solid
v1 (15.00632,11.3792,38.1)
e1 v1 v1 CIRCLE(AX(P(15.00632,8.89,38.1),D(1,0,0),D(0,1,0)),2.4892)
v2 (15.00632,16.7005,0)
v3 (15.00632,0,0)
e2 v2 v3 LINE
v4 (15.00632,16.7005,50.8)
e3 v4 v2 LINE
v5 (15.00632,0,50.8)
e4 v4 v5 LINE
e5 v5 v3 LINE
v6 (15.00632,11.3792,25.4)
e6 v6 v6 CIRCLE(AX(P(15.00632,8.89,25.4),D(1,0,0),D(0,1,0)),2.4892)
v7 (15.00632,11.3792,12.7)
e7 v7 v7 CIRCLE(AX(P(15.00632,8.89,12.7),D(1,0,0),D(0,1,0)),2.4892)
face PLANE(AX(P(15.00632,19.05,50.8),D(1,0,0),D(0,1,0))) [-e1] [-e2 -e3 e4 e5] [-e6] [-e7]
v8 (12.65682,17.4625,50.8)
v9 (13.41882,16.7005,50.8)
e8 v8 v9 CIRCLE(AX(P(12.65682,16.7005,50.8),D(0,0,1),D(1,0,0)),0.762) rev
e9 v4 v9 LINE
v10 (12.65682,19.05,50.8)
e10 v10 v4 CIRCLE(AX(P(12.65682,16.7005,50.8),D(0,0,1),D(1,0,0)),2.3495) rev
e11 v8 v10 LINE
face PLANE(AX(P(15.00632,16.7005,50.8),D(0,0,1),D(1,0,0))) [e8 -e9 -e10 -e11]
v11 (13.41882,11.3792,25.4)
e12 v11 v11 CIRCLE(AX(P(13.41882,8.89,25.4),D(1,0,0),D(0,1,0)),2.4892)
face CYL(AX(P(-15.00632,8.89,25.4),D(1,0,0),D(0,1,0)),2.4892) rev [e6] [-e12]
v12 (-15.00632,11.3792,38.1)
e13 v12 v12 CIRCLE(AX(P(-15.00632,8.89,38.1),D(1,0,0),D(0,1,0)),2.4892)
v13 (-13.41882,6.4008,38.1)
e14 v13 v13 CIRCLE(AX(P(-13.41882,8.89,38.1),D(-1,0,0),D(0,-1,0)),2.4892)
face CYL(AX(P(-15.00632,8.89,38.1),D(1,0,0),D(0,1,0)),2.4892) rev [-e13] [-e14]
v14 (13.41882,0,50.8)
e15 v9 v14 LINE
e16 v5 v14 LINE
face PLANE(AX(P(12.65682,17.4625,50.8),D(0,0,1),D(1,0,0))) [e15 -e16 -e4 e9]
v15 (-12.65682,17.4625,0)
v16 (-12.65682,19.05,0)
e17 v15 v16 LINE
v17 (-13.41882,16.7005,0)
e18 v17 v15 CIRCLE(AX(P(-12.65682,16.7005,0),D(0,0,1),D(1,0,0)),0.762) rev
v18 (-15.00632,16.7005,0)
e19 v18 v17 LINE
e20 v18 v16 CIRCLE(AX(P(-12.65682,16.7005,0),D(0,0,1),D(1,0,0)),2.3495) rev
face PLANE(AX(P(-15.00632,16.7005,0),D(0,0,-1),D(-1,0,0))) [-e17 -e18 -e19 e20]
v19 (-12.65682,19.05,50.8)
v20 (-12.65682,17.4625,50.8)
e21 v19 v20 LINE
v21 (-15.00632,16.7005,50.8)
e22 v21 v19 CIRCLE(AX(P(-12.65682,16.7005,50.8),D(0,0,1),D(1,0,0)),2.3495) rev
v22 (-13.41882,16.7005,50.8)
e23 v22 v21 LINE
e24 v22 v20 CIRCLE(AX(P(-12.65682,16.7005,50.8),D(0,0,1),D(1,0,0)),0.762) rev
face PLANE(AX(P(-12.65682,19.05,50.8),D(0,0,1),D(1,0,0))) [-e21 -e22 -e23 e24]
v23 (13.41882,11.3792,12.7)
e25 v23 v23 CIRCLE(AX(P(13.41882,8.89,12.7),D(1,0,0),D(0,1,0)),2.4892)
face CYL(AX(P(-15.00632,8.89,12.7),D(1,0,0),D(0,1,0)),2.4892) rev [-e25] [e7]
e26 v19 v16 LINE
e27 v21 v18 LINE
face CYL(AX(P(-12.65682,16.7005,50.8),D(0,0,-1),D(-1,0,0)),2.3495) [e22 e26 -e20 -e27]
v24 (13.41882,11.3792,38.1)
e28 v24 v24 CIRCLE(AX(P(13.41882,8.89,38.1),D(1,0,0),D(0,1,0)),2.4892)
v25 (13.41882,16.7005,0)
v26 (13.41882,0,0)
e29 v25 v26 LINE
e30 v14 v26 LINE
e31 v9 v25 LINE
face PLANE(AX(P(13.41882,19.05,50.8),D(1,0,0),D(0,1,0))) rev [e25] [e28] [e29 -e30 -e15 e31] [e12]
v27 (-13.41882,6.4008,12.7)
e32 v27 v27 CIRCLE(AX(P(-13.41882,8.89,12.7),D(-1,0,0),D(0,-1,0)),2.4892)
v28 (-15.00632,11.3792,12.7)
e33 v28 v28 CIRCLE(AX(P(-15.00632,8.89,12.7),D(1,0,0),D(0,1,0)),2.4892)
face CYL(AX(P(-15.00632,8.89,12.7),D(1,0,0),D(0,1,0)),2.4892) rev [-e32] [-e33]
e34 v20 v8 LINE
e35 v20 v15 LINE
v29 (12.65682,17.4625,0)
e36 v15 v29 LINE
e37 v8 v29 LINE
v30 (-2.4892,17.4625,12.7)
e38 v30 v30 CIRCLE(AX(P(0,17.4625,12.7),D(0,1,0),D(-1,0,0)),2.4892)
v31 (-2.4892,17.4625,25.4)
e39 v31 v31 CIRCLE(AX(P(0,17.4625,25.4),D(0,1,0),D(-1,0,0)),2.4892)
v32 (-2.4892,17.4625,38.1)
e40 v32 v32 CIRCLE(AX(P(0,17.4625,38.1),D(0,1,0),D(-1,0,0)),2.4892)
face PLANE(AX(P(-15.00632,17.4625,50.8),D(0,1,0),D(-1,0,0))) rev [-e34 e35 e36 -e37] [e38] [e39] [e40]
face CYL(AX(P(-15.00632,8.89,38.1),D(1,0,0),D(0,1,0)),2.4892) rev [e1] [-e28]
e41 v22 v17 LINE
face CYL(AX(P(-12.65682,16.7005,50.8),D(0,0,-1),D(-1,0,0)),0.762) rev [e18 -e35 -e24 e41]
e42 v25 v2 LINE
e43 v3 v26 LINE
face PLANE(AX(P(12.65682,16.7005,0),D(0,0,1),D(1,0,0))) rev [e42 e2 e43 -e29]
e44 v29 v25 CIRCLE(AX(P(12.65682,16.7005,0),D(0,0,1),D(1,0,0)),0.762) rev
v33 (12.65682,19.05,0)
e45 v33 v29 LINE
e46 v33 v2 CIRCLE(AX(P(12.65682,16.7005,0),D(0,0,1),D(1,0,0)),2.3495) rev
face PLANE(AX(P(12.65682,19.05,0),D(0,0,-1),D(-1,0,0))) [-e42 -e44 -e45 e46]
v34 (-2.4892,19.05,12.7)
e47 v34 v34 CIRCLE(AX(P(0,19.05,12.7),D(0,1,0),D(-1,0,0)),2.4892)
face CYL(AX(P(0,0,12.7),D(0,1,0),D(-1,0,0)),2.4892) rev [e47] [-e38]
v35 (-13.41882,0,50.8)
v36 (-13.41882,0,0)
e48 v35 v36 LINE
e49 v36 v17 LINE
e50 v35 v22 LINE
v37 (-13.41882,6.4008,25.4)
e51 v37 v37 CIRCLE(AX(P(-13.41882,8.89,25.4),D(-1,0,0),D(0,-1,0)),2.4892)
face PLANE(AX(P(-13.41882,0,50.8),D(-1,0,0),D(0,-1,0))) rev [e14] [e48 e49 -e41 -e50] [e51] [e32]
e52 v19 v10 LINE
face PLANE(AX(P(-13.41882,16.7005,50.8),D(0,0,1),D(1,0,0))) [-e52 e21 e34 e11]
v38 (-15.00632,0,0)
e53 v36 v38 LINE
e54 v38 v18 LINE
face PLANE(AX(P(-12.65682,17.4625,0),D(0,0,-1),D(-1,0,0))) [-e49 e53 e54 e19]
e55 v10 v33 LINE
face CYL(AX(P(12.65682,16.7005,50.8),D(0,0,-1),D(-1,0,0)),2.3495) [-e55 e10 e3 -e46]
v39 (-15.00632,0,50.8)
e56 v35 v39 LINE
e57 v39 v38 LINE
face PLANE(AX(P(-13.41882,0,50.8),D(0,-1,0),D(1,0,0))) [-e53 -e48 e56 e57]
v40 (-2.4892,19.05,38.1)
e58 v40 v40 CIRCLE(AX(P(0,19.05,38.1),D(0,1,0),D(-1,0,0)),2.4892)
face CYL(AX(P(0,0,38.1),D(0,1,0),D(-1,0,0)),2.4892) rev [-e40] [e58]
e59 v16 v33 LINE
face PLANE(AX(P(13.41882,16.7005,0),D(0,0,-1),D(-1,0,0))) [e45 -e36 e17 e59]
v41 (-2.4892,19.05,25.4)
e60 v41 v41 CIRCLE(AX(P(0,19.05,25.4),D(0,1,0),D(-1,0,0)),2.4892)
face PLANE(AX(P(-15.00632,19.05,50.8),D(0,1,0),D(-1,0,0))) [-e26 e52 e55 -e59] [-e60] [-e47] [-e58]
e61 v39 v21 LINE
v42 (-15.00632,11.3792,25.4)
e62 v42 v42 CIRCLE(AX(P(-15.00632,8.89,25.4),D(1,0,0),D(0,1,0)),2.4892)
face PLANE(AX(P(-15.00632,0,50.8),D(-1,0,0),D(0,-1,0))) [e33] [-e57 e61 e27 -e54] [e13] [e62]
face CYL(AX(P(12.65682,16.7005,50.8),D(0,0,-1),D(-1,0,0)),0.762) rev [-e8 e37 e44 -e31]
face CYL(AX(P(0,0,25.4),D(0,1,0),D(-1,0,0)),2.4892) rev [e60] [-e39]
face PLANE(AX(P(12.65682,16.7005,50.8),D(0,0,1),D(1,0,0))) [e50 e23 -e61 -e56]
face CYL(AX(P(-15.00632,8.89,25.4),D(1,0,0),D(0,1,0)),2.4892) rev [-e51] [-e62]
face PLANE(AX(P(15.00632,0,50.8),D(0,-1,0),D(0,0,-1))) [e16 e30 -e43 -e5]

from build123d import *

# Parameters (mm, degrees)
BASE_FLANGE1_DEPTH = 50.8
SKETCH6_R          = 2.4892
CUT_EXTRUDE1_DEPTH = 63.002427854
SKETCH7_R          = 2.4892
CUT_EXTRUDE2_DEPTH = 57.291492607


# Sheet-metal steps are written as plain solids
with BuildPart() as part:
    # Sketch1 → Base-Flange1 (new body)
    with BuildSketch(Plane.XY):
        with BuildLine():
            Line((-15.00632, 0), (-15.00632, 16.7005))
            ThreePointArc((-15.00632, 16.7005), (-14.318167382, 18.361847382), (-12.65682, 19.05))
            Line((-12.65682, 19.05), (12.65682, 19.05))
            ThreePointArc((12.65682, 19.05), (14.318167382, 18.361847382), (15.00632, 16.7005))
            Line((15.00632, 16.7005), (15.00632, 0))
            Line((15.00632, 0), (13.41882, 0))
            Line((13.41882, 0), (13.41882, 16.7005))
            ThreePointArc((13.41882, 16.7005), (13.195635367, 17.239315367), (12.65682, 17.4625))
            Line((12.65682, 17.4625), (-12.65682, 17.4625))
            ThreePointArc((-12.65682, 17.4625), (-13.195635367, 17.239315367), (-13.41882, 16.7005))
            Line((-13.41882, 16.7005), (-13.41882, 0))
            Line((-13.41882, 0), (-15.00632, 0))
        make_face()
    extrude(amount=BASE_FLANGE1_DEPTH)

    # Sketch6 → Cut-Extrude1 (cut, through all)
    with BuildSketch(Plane(origin=(15.00632, 0, 0), x_dir=(0, 0, -1), z_dir=(1, 0, 0))):
        with Locations(Location((-25.4, 8.89, 0), (0, 0, 90))):
            Circle(SKETCH6_R)
        with Locations(Location((-38.1, 8.89, 0), (0, 0, 90))):
            Circle(SKETCH6_R)
        with Locations(Location((-12.7, 8.89, 0), (0, 0, 90))):
            Circle(SKETCH6_R)
    extrude(amount=-CUT_EXTRUDE1_DEPTH, mode=Mode.SUBTRACT)

    # Sketch7 → Cut-Extrude2 (cut, through all)
    with BuildSketch(Plane(origin=(0, 19.05, 0), x_dir=(1, 0, 0), z_dir=(0, 1, 0))):
        with Locations(Location((0, -12.7, 0), (0, 0, 180))):
            Circle(SKETCH7_R)
        with Locations(Location((0, -25.4, 0), (0, 0, 180))):
            Circle(SKETCH7_R)
        with Locations(Location((0, -38.1, 0), (0, 0, 180))):
            Circle(SKETCH7_R)
    extrude(amount=-CUT_EXTRUDE2_DEPTH, mode=Mode.SUBTRACT)


solid = part.part
